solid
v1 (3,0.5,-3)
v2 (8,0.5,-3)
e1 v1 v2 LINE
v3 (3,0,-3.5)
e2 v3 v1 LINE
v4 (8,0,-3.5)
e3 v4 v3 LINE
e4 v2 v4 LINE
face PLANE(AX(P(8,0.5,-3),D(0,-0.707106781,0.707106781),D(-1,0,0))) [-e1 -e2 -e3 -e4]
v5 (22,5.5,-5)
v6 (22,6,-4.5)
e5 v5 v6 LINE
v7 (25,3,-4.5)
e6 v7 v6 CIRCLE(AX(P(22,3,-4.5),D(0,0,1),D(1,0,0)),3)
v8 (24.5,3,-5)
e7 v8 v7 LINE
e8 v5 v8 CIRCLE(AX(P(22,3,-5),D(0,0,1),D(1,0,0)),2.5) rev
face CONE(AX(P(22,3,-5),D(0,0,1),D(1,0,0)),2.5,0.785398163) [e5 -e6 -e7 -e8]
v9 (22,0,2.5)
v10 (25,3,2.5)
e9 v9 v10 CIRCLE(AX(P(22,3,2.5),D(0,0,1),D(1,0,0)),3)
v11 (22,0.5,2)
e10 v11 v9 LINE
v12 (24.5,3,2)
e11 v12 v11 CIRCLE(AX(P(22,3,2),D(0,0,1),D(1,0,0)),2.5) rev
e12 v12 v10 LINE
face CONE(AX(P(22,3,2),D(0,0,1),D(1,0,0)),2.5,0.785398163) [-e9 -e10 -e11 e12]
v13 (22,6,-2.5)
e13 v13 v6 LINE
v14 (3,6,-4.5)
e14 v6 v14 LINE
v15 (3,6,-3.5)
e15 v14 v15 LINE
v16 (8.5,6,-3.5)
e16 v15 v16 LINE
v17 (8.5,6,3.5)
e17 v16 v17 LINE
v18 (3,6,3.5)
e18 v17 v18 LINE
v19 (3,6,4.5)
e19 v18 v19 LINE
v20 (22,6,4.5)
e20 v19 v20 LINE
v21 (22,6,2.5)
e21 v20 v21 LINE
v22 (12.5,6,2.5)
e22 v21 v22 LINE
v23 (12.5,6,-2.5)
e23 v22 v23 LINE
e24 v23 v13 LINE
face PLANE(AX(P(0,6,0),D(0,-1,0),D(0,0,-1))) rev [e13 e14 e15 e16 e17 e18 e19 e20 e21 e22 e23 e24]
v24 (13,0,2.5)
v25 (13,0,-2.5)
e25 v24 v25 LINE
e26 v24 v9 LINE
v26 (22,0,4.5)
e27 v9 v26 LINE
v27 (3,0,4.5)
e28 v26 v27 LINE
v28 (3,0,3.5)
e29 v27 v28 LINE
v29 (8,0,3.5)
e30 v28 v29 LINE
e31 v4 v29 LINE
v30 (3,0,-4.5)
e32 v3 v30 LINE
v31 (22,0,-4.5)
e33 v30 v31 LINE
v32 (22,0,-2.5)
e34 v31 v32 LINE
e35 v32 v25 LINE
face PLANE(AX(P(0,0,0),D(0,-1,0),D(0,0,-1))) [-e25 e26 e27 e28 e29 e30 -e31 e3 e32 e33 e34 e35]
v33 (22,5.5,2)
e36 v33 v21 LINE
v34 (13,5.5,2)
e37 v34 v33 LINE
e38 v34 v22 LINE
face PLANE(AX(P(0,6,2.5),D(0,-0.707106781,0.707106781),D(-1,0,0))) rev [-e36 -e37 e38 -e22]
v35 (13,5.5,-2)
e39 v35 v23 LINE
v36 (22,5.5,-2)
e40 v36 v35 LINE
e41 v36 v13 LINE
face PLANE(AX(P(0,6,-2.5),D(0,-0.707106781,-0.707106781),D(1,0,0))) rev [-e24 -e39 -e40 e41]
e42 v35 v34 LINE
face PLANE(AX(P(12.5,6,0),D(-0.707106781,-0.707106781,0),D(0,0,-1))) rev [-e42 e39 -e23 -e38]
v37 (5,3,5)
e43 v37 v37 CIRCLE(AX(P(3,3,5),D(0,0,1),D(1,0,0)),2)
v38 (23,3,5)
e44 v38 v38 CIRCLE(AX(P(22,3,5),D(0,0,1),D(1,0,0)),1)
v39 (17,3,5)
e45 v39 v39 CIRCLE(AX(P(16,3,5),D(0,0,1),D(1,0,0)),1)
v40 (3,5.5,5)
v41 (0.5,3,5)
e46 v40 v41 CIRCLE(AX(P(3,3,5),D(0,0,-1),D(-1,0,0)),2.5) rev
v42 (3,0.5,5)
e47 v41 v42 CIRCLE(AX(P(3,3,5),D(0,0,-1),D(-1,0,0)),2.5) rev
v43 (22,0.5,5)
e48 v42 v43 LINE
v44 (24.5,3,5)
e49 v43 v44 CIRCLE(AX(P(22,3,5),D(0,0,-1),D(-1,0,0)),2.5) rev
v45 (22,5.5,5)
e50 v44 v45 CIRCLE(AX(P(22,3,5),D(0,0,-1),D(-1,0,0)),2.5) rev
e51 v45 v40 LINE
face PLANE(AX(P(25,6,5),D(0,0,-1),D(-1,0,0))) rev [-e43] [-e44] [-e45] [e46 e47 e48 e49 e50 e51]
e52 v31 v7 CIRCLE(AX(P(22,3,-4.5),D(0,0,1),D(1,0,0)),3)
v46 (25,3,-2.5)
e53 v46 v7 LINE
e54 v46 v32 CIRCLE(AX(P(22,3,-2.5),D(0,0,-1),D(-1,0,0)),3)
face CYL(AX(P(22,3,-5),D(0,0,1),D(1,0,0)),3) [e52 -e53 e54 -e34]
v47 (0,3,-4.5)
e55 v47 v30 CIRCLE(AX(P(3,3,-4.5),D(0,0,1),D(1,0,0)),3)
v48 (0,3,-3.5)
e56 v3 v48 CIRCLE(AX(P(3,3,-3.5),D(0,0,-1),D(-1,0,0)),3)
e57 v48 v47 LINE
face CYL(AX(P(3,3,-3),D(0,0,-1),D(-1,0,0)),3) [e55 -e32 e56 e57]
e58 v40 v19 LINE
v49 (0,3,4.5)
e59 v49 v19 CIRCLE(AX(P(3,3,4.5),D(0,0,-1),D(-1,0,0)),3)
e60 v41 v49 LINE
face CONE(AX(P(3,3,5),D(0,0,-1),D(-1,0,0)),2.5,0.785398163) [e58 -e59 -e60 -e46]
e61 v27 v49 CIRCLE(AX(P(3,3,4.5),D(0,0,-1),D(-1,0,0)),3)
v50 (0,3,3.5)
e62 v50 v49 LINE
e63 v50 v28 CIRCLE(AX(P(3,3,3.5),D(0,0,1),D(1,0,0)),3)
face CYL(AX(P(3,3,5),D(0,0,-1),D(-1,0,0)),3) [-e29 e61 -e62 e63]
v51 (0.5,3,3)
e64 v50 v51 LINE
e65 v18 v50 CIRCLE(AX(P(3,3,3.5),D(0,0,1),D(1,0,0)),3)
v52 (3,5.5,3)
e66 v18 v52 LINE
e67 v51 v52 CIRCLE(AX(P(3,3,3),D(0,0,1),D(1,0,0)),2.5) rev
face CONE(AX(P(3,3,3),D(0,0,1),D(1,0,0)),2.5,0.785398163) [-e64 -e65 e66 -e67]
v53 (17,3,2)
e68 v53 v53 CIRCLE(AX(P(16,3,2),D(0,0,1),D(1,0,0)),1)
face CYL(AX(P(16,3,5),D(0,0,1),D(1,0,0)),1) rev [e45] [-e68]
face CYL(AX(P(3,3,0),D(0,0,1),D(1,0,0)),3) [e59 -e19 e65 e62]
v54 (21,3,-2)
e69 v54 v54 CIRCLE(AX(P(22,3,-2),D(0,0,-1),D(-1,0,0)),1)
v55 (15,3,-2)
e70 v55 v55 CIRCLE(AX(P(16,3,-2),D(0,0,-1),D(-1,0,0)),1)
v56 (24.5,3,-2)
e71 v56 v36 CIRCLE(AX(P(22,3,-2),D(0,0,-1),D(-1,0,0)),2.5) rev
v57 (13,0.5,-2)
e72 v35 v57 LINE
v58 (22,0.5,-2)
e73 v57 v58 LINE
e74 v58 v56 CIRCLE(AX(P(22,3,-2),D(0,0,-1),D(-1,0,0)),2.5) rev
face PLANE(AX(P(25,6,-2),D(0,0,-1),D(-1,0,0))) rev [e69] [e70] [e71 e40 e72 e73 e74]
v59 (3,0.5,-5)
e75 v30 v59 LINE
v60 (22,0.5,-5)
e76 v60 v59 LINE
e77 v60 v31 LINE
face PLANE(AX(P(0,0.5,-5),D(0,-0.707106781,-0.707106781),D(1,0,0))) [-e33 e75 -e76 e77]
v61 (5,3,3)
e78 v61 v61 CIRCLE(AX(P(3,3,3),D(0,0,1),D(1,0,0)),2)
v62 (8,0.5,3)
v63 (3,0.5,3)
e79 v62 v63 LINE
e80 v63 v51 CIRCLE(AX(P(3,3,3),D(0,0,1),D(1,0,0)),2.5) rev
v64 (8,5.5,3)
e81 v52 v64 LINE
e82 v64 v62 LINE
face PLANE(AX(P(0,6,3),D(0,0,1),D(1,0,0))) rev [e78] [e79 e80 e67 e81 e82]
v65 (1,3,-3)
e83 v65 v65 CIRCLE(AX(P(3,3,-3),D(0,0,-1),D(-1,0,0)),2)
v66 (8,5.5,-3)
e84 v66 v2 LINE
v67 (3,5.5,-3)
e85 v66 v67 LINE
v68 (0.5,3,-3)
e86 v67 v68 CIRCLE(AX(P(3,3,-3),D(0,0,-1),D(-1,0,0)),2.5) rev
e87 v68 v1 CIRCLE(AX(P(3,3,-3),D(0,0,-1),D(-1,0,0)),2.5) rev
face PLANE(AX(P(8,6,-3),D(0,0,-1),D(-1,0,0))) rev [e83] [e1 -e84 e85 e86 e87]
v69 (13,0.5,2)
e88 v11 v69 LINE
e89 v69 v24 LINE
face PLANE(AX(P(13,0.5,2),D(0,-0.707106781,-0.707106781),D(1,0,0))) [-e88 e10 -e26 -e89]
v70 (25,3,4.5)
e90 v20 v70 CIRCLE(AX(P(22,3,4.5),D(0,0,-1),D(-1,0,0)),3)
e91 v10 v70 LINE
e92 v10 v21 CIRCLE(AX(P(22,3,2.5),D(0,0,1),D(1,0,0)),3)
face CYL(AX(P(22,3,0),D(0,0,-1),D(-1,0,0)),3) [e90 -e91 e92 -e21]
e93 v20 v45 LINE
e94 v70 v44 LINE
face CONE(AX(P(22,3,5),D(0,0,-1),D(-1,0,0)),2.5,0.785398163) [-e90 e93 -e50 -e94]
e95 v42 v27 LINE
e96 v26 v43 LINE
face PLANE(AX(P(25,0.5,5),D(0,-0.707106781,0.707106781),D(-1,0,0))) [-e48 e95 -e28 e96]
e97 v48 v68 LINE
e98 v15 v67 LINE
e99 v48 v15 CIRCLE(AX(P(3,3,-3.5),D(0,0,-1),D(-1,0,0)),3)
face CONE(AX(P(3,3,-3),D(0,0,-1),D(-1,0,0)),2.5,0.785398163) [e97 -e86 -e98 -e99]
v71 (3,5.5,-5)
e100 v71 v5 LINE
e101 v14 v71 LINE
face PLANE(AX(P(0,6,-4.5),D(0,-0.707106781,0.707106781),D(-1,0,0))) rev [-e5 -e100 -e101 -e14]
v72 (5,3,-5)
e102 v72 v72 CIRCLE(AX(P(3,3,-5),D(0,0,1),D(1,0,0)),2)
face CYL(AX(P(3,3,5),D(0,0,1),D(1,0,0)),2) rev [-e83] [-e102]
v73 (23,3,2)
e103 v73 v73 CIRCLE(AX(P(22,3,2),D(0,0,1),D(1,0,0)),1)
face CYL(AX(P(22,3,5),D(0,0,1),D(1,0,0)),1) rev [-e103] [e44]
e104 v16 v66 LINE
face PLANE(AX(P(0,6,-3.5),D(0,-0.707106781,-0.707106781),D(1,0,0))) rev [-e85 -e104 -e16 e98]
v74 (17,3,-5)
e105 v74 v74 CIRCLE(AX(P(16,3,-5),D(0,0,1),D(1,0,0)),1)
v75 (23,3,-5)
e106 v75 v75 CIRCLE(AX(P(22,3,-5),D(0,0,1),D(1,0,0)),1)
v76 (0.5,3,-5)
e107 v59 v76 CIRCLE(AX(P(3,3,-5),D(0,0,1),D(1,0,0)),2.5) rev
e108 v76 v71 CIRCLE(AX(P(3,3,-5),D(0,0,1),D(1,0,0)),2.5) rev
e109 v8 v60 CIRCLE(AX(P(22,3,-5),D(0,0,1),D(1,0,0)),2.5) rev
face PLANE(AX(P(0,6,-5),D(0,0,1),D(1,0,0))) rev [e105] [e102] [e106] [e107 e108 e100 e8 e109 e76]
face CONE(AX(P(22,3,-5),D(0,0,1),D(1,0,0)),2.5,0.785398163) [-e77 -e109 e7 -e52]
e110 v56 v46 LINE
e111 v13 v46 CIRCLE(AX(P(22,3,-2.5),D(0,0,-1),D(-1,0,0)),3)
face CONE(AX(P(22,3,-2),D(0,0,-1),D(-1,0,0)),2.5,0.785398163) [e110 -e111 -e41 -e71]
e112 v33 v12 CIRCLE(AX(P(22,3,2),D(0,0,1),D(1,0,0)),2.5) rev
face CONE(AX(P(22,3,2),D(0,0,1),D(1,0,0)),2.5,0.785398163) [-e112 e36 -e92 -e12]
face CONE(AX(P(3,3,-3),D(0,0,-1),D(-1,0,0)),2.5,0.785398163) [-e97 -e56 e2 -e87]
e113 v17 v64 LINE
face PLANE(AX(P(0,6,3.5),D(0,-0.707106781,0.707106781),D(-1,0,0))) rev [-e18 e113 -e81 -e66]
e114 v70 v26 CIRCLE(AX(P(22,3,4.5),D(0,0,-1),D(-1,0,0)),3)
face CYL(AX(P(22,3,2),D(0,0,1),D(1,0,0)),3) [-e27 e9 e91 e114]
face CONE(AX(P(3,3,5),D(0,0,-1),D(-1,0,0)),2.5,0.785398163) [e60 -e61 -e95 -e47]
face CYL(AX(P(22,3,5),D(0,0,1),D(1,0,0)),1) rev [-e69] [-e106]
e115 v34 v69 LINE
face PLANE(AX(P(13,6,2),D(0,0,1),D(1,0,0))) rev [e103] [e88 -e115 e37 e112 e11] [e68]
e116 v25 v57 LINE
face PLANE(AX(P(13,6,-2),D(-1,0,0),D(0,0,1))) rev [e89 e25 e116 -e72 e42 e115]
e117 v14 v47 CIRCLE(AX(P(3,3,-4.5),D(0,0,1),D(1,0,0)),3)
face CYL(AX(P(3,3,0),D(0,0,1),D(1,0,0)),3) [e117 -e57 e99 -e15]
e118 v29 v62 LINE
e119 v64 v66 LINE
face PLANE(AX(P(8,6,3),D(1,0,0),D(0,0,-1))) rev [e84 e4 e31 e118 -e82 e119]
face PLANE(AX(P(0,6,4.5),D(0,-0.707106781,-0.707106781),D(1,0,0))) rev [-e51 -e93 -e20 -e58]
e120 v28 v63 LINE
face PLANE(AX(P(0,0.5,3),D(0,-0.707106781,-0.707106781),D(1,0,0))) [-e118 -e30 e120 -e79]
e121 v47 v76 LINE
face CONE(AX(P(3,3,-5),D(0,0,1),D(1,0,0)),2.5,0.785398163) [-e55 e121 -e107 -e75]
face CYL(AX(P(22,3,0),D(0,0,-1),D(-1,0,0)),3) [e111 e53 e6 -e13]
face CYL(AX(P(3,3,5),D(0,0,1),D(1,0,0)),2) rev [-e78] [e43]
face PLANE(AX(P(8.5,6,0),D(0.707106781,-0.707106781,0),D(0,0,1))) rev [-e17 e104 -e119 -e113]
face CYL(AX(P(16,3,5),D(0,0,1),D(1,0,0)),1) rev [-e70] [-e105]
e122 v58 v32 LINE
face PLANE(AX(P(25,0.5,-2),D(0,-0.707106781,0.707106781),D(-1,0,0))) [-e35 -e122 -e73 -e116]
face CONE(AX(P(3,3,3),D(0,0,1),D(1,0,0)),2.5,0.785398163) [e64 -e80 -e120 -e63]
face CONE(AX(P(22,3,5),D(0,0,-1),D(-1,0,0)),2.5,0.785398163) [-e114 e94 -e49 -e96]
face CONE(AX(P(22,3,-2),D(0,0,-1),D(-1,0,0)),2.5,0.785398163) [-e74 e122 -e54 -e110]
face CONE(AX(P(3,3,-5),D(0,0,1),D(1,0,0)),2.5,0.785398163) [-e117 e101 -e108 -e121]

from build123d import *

# Parameters (mm, degrees)
BOSS_EXTRUDE1_DEPTH       = 6
FILLET1_R                 = 3
F_4_0MM_DOWEL_HOLE1_D     = 4
F_4_0MM_DOWEL_HOLE1_DEPTH = 10
F_4_0MM_DOWEL_HOLE1_TIP   = 1.201721238
F_2_0MM_DOWEL_HOLE1_D     = 2
F_2_0MM_DOWEL_HOLE1_DEPTH = 10
F_2_0MM_DOWEL_HOLE1_TIP   = 0.600860619
CHAMFER1_SIZE             = 0.5


with BuildPart() as part:
    # Sketch2 → Boss-Extrude1 (new body)
    with BuildSketch(Plane(origin=(0, 0, 0), x_dir=(1, 0, 0), z_dir=(0, 1, 0))):
        Polygon((0, 3), (0, 5), (25, 5), (25, 2), (13, 2), (13, -2), (25, -2), (25, -5), (0, -5), (0, -3), (8, -3), (8, 3), align=None)
    extrude(amount=BOSS_EXTRUDE1_DEPTH)

    # Fillet1
    fillet1_edges = [part.edges().sort_by_distance(p)[0] for p in [
        (25, 6, -3.5),
        (25, 0, -3.5),
        (25, 0, 3.5),
        (25, 6, 3.5),
        (0, 6, 4),
        (0, 0, 4),
        (0, 0, -4),
        (0, 6, -4),
    ]]
    fillet(fillet1_edges, radius=FILLET1_R - 0.0001)  # a hair under: the kernel refuses the full size

    # Ø4.0mm Dowel Hole1
    with Locations(Plane.XY.offset(5)):
        with Locations((3, 3)):
            Hole(F_4_0MM_DOWEL_HOLE1_D / 2, depth=F_4_0MM_DOWEL_HOLE1_DEPTH)
            with Locations((0, 0, -(F_4_0MM_DOWEL_HOLE1_DEPTH + F_4_0MM_DOWEL_HOLE1_TIP / 2))):  # 118° drill point
                Cone(0, F_4_0MM_DOWEL_HOLE1_D / 2, F_4_0MM_DOWEL_HOLE1_TIP, mode=Mode.SUBTRACT)

    # Ø2.0mm Dowel Hole1
    with Locations(Plane(origin=(16, 3, 5), x_dir=(1, 0, 0), z_dir=(0, 0, 1))):
        with Locations((0, 0), (6, 0)):
            Hole(F_2_0MM_DOWEL_HOLE1_D / 2, depth=F_2_0MM_DOWEL_HOLE1_DEPTH)
            with Locations((0, 0, -(F_2_0MM_DOWEL_HOLE1_DEPTH + F_2_0MM_DOWEL_HOLE1_TIP / 2))):  # 118° drill point
                Cone(0, F_2_0MM_DOWEL_HOLE1_D / 2, F_2_0MM_DOWEL_HOLE1_TIP, mode=Mode.SUBTRACT)

    # Chamfer1
    chamfer1_edges = [part.edges().sort_by_distance(p)[0] for p in [
        (5.49995, 6, 3),
        (17.50005, 0, -2),
        (5.49995, 0, 3),
        (13, 6, 0),
        (5.49995, 6, -3),
        (12.5, 6, 5),
        (17.50005, 6, 2),
        (17.50005, 6, -2),
        (12.5, 6, -5),
        (12.5, 0, -5),
        (0.878650367, 5.121349633, -5),
        (0.878650367, 0.878650367, -5),
        (24.121349633, 0.878650367, -5),
        (24.121349633, 5.121349633, -5),
        (24.121349633, 0.878650367, -2),
        (24.121349633, 5.121349633, -2),
        (5.49995, 0, -3),
        (17.50005, 0, 2),
        (12.5, 0, 5),
        (24.121349633, 5.121349633, 2),
        (24.121349633, 0.878650367, 2),
        (0.878650367, 0.878650367, 5),
        (0.878650367, 5.121349633, 5),
        (24.121349633, 5.121349633, 5),
        (24.121349633, 0.878650367, 5),
        (0.878650367, 0.878650367, 3),
        (0.878650367, 5.121349633, 3),
        (0.878650367, 5.121349633, -3),
        (0.878650367, 0.878650367, -3),
        (8, 6, 0),
    ]]
    chamfer(chamfer1_edges, length=CHAMFER1_SIZE)


solid = part.part
